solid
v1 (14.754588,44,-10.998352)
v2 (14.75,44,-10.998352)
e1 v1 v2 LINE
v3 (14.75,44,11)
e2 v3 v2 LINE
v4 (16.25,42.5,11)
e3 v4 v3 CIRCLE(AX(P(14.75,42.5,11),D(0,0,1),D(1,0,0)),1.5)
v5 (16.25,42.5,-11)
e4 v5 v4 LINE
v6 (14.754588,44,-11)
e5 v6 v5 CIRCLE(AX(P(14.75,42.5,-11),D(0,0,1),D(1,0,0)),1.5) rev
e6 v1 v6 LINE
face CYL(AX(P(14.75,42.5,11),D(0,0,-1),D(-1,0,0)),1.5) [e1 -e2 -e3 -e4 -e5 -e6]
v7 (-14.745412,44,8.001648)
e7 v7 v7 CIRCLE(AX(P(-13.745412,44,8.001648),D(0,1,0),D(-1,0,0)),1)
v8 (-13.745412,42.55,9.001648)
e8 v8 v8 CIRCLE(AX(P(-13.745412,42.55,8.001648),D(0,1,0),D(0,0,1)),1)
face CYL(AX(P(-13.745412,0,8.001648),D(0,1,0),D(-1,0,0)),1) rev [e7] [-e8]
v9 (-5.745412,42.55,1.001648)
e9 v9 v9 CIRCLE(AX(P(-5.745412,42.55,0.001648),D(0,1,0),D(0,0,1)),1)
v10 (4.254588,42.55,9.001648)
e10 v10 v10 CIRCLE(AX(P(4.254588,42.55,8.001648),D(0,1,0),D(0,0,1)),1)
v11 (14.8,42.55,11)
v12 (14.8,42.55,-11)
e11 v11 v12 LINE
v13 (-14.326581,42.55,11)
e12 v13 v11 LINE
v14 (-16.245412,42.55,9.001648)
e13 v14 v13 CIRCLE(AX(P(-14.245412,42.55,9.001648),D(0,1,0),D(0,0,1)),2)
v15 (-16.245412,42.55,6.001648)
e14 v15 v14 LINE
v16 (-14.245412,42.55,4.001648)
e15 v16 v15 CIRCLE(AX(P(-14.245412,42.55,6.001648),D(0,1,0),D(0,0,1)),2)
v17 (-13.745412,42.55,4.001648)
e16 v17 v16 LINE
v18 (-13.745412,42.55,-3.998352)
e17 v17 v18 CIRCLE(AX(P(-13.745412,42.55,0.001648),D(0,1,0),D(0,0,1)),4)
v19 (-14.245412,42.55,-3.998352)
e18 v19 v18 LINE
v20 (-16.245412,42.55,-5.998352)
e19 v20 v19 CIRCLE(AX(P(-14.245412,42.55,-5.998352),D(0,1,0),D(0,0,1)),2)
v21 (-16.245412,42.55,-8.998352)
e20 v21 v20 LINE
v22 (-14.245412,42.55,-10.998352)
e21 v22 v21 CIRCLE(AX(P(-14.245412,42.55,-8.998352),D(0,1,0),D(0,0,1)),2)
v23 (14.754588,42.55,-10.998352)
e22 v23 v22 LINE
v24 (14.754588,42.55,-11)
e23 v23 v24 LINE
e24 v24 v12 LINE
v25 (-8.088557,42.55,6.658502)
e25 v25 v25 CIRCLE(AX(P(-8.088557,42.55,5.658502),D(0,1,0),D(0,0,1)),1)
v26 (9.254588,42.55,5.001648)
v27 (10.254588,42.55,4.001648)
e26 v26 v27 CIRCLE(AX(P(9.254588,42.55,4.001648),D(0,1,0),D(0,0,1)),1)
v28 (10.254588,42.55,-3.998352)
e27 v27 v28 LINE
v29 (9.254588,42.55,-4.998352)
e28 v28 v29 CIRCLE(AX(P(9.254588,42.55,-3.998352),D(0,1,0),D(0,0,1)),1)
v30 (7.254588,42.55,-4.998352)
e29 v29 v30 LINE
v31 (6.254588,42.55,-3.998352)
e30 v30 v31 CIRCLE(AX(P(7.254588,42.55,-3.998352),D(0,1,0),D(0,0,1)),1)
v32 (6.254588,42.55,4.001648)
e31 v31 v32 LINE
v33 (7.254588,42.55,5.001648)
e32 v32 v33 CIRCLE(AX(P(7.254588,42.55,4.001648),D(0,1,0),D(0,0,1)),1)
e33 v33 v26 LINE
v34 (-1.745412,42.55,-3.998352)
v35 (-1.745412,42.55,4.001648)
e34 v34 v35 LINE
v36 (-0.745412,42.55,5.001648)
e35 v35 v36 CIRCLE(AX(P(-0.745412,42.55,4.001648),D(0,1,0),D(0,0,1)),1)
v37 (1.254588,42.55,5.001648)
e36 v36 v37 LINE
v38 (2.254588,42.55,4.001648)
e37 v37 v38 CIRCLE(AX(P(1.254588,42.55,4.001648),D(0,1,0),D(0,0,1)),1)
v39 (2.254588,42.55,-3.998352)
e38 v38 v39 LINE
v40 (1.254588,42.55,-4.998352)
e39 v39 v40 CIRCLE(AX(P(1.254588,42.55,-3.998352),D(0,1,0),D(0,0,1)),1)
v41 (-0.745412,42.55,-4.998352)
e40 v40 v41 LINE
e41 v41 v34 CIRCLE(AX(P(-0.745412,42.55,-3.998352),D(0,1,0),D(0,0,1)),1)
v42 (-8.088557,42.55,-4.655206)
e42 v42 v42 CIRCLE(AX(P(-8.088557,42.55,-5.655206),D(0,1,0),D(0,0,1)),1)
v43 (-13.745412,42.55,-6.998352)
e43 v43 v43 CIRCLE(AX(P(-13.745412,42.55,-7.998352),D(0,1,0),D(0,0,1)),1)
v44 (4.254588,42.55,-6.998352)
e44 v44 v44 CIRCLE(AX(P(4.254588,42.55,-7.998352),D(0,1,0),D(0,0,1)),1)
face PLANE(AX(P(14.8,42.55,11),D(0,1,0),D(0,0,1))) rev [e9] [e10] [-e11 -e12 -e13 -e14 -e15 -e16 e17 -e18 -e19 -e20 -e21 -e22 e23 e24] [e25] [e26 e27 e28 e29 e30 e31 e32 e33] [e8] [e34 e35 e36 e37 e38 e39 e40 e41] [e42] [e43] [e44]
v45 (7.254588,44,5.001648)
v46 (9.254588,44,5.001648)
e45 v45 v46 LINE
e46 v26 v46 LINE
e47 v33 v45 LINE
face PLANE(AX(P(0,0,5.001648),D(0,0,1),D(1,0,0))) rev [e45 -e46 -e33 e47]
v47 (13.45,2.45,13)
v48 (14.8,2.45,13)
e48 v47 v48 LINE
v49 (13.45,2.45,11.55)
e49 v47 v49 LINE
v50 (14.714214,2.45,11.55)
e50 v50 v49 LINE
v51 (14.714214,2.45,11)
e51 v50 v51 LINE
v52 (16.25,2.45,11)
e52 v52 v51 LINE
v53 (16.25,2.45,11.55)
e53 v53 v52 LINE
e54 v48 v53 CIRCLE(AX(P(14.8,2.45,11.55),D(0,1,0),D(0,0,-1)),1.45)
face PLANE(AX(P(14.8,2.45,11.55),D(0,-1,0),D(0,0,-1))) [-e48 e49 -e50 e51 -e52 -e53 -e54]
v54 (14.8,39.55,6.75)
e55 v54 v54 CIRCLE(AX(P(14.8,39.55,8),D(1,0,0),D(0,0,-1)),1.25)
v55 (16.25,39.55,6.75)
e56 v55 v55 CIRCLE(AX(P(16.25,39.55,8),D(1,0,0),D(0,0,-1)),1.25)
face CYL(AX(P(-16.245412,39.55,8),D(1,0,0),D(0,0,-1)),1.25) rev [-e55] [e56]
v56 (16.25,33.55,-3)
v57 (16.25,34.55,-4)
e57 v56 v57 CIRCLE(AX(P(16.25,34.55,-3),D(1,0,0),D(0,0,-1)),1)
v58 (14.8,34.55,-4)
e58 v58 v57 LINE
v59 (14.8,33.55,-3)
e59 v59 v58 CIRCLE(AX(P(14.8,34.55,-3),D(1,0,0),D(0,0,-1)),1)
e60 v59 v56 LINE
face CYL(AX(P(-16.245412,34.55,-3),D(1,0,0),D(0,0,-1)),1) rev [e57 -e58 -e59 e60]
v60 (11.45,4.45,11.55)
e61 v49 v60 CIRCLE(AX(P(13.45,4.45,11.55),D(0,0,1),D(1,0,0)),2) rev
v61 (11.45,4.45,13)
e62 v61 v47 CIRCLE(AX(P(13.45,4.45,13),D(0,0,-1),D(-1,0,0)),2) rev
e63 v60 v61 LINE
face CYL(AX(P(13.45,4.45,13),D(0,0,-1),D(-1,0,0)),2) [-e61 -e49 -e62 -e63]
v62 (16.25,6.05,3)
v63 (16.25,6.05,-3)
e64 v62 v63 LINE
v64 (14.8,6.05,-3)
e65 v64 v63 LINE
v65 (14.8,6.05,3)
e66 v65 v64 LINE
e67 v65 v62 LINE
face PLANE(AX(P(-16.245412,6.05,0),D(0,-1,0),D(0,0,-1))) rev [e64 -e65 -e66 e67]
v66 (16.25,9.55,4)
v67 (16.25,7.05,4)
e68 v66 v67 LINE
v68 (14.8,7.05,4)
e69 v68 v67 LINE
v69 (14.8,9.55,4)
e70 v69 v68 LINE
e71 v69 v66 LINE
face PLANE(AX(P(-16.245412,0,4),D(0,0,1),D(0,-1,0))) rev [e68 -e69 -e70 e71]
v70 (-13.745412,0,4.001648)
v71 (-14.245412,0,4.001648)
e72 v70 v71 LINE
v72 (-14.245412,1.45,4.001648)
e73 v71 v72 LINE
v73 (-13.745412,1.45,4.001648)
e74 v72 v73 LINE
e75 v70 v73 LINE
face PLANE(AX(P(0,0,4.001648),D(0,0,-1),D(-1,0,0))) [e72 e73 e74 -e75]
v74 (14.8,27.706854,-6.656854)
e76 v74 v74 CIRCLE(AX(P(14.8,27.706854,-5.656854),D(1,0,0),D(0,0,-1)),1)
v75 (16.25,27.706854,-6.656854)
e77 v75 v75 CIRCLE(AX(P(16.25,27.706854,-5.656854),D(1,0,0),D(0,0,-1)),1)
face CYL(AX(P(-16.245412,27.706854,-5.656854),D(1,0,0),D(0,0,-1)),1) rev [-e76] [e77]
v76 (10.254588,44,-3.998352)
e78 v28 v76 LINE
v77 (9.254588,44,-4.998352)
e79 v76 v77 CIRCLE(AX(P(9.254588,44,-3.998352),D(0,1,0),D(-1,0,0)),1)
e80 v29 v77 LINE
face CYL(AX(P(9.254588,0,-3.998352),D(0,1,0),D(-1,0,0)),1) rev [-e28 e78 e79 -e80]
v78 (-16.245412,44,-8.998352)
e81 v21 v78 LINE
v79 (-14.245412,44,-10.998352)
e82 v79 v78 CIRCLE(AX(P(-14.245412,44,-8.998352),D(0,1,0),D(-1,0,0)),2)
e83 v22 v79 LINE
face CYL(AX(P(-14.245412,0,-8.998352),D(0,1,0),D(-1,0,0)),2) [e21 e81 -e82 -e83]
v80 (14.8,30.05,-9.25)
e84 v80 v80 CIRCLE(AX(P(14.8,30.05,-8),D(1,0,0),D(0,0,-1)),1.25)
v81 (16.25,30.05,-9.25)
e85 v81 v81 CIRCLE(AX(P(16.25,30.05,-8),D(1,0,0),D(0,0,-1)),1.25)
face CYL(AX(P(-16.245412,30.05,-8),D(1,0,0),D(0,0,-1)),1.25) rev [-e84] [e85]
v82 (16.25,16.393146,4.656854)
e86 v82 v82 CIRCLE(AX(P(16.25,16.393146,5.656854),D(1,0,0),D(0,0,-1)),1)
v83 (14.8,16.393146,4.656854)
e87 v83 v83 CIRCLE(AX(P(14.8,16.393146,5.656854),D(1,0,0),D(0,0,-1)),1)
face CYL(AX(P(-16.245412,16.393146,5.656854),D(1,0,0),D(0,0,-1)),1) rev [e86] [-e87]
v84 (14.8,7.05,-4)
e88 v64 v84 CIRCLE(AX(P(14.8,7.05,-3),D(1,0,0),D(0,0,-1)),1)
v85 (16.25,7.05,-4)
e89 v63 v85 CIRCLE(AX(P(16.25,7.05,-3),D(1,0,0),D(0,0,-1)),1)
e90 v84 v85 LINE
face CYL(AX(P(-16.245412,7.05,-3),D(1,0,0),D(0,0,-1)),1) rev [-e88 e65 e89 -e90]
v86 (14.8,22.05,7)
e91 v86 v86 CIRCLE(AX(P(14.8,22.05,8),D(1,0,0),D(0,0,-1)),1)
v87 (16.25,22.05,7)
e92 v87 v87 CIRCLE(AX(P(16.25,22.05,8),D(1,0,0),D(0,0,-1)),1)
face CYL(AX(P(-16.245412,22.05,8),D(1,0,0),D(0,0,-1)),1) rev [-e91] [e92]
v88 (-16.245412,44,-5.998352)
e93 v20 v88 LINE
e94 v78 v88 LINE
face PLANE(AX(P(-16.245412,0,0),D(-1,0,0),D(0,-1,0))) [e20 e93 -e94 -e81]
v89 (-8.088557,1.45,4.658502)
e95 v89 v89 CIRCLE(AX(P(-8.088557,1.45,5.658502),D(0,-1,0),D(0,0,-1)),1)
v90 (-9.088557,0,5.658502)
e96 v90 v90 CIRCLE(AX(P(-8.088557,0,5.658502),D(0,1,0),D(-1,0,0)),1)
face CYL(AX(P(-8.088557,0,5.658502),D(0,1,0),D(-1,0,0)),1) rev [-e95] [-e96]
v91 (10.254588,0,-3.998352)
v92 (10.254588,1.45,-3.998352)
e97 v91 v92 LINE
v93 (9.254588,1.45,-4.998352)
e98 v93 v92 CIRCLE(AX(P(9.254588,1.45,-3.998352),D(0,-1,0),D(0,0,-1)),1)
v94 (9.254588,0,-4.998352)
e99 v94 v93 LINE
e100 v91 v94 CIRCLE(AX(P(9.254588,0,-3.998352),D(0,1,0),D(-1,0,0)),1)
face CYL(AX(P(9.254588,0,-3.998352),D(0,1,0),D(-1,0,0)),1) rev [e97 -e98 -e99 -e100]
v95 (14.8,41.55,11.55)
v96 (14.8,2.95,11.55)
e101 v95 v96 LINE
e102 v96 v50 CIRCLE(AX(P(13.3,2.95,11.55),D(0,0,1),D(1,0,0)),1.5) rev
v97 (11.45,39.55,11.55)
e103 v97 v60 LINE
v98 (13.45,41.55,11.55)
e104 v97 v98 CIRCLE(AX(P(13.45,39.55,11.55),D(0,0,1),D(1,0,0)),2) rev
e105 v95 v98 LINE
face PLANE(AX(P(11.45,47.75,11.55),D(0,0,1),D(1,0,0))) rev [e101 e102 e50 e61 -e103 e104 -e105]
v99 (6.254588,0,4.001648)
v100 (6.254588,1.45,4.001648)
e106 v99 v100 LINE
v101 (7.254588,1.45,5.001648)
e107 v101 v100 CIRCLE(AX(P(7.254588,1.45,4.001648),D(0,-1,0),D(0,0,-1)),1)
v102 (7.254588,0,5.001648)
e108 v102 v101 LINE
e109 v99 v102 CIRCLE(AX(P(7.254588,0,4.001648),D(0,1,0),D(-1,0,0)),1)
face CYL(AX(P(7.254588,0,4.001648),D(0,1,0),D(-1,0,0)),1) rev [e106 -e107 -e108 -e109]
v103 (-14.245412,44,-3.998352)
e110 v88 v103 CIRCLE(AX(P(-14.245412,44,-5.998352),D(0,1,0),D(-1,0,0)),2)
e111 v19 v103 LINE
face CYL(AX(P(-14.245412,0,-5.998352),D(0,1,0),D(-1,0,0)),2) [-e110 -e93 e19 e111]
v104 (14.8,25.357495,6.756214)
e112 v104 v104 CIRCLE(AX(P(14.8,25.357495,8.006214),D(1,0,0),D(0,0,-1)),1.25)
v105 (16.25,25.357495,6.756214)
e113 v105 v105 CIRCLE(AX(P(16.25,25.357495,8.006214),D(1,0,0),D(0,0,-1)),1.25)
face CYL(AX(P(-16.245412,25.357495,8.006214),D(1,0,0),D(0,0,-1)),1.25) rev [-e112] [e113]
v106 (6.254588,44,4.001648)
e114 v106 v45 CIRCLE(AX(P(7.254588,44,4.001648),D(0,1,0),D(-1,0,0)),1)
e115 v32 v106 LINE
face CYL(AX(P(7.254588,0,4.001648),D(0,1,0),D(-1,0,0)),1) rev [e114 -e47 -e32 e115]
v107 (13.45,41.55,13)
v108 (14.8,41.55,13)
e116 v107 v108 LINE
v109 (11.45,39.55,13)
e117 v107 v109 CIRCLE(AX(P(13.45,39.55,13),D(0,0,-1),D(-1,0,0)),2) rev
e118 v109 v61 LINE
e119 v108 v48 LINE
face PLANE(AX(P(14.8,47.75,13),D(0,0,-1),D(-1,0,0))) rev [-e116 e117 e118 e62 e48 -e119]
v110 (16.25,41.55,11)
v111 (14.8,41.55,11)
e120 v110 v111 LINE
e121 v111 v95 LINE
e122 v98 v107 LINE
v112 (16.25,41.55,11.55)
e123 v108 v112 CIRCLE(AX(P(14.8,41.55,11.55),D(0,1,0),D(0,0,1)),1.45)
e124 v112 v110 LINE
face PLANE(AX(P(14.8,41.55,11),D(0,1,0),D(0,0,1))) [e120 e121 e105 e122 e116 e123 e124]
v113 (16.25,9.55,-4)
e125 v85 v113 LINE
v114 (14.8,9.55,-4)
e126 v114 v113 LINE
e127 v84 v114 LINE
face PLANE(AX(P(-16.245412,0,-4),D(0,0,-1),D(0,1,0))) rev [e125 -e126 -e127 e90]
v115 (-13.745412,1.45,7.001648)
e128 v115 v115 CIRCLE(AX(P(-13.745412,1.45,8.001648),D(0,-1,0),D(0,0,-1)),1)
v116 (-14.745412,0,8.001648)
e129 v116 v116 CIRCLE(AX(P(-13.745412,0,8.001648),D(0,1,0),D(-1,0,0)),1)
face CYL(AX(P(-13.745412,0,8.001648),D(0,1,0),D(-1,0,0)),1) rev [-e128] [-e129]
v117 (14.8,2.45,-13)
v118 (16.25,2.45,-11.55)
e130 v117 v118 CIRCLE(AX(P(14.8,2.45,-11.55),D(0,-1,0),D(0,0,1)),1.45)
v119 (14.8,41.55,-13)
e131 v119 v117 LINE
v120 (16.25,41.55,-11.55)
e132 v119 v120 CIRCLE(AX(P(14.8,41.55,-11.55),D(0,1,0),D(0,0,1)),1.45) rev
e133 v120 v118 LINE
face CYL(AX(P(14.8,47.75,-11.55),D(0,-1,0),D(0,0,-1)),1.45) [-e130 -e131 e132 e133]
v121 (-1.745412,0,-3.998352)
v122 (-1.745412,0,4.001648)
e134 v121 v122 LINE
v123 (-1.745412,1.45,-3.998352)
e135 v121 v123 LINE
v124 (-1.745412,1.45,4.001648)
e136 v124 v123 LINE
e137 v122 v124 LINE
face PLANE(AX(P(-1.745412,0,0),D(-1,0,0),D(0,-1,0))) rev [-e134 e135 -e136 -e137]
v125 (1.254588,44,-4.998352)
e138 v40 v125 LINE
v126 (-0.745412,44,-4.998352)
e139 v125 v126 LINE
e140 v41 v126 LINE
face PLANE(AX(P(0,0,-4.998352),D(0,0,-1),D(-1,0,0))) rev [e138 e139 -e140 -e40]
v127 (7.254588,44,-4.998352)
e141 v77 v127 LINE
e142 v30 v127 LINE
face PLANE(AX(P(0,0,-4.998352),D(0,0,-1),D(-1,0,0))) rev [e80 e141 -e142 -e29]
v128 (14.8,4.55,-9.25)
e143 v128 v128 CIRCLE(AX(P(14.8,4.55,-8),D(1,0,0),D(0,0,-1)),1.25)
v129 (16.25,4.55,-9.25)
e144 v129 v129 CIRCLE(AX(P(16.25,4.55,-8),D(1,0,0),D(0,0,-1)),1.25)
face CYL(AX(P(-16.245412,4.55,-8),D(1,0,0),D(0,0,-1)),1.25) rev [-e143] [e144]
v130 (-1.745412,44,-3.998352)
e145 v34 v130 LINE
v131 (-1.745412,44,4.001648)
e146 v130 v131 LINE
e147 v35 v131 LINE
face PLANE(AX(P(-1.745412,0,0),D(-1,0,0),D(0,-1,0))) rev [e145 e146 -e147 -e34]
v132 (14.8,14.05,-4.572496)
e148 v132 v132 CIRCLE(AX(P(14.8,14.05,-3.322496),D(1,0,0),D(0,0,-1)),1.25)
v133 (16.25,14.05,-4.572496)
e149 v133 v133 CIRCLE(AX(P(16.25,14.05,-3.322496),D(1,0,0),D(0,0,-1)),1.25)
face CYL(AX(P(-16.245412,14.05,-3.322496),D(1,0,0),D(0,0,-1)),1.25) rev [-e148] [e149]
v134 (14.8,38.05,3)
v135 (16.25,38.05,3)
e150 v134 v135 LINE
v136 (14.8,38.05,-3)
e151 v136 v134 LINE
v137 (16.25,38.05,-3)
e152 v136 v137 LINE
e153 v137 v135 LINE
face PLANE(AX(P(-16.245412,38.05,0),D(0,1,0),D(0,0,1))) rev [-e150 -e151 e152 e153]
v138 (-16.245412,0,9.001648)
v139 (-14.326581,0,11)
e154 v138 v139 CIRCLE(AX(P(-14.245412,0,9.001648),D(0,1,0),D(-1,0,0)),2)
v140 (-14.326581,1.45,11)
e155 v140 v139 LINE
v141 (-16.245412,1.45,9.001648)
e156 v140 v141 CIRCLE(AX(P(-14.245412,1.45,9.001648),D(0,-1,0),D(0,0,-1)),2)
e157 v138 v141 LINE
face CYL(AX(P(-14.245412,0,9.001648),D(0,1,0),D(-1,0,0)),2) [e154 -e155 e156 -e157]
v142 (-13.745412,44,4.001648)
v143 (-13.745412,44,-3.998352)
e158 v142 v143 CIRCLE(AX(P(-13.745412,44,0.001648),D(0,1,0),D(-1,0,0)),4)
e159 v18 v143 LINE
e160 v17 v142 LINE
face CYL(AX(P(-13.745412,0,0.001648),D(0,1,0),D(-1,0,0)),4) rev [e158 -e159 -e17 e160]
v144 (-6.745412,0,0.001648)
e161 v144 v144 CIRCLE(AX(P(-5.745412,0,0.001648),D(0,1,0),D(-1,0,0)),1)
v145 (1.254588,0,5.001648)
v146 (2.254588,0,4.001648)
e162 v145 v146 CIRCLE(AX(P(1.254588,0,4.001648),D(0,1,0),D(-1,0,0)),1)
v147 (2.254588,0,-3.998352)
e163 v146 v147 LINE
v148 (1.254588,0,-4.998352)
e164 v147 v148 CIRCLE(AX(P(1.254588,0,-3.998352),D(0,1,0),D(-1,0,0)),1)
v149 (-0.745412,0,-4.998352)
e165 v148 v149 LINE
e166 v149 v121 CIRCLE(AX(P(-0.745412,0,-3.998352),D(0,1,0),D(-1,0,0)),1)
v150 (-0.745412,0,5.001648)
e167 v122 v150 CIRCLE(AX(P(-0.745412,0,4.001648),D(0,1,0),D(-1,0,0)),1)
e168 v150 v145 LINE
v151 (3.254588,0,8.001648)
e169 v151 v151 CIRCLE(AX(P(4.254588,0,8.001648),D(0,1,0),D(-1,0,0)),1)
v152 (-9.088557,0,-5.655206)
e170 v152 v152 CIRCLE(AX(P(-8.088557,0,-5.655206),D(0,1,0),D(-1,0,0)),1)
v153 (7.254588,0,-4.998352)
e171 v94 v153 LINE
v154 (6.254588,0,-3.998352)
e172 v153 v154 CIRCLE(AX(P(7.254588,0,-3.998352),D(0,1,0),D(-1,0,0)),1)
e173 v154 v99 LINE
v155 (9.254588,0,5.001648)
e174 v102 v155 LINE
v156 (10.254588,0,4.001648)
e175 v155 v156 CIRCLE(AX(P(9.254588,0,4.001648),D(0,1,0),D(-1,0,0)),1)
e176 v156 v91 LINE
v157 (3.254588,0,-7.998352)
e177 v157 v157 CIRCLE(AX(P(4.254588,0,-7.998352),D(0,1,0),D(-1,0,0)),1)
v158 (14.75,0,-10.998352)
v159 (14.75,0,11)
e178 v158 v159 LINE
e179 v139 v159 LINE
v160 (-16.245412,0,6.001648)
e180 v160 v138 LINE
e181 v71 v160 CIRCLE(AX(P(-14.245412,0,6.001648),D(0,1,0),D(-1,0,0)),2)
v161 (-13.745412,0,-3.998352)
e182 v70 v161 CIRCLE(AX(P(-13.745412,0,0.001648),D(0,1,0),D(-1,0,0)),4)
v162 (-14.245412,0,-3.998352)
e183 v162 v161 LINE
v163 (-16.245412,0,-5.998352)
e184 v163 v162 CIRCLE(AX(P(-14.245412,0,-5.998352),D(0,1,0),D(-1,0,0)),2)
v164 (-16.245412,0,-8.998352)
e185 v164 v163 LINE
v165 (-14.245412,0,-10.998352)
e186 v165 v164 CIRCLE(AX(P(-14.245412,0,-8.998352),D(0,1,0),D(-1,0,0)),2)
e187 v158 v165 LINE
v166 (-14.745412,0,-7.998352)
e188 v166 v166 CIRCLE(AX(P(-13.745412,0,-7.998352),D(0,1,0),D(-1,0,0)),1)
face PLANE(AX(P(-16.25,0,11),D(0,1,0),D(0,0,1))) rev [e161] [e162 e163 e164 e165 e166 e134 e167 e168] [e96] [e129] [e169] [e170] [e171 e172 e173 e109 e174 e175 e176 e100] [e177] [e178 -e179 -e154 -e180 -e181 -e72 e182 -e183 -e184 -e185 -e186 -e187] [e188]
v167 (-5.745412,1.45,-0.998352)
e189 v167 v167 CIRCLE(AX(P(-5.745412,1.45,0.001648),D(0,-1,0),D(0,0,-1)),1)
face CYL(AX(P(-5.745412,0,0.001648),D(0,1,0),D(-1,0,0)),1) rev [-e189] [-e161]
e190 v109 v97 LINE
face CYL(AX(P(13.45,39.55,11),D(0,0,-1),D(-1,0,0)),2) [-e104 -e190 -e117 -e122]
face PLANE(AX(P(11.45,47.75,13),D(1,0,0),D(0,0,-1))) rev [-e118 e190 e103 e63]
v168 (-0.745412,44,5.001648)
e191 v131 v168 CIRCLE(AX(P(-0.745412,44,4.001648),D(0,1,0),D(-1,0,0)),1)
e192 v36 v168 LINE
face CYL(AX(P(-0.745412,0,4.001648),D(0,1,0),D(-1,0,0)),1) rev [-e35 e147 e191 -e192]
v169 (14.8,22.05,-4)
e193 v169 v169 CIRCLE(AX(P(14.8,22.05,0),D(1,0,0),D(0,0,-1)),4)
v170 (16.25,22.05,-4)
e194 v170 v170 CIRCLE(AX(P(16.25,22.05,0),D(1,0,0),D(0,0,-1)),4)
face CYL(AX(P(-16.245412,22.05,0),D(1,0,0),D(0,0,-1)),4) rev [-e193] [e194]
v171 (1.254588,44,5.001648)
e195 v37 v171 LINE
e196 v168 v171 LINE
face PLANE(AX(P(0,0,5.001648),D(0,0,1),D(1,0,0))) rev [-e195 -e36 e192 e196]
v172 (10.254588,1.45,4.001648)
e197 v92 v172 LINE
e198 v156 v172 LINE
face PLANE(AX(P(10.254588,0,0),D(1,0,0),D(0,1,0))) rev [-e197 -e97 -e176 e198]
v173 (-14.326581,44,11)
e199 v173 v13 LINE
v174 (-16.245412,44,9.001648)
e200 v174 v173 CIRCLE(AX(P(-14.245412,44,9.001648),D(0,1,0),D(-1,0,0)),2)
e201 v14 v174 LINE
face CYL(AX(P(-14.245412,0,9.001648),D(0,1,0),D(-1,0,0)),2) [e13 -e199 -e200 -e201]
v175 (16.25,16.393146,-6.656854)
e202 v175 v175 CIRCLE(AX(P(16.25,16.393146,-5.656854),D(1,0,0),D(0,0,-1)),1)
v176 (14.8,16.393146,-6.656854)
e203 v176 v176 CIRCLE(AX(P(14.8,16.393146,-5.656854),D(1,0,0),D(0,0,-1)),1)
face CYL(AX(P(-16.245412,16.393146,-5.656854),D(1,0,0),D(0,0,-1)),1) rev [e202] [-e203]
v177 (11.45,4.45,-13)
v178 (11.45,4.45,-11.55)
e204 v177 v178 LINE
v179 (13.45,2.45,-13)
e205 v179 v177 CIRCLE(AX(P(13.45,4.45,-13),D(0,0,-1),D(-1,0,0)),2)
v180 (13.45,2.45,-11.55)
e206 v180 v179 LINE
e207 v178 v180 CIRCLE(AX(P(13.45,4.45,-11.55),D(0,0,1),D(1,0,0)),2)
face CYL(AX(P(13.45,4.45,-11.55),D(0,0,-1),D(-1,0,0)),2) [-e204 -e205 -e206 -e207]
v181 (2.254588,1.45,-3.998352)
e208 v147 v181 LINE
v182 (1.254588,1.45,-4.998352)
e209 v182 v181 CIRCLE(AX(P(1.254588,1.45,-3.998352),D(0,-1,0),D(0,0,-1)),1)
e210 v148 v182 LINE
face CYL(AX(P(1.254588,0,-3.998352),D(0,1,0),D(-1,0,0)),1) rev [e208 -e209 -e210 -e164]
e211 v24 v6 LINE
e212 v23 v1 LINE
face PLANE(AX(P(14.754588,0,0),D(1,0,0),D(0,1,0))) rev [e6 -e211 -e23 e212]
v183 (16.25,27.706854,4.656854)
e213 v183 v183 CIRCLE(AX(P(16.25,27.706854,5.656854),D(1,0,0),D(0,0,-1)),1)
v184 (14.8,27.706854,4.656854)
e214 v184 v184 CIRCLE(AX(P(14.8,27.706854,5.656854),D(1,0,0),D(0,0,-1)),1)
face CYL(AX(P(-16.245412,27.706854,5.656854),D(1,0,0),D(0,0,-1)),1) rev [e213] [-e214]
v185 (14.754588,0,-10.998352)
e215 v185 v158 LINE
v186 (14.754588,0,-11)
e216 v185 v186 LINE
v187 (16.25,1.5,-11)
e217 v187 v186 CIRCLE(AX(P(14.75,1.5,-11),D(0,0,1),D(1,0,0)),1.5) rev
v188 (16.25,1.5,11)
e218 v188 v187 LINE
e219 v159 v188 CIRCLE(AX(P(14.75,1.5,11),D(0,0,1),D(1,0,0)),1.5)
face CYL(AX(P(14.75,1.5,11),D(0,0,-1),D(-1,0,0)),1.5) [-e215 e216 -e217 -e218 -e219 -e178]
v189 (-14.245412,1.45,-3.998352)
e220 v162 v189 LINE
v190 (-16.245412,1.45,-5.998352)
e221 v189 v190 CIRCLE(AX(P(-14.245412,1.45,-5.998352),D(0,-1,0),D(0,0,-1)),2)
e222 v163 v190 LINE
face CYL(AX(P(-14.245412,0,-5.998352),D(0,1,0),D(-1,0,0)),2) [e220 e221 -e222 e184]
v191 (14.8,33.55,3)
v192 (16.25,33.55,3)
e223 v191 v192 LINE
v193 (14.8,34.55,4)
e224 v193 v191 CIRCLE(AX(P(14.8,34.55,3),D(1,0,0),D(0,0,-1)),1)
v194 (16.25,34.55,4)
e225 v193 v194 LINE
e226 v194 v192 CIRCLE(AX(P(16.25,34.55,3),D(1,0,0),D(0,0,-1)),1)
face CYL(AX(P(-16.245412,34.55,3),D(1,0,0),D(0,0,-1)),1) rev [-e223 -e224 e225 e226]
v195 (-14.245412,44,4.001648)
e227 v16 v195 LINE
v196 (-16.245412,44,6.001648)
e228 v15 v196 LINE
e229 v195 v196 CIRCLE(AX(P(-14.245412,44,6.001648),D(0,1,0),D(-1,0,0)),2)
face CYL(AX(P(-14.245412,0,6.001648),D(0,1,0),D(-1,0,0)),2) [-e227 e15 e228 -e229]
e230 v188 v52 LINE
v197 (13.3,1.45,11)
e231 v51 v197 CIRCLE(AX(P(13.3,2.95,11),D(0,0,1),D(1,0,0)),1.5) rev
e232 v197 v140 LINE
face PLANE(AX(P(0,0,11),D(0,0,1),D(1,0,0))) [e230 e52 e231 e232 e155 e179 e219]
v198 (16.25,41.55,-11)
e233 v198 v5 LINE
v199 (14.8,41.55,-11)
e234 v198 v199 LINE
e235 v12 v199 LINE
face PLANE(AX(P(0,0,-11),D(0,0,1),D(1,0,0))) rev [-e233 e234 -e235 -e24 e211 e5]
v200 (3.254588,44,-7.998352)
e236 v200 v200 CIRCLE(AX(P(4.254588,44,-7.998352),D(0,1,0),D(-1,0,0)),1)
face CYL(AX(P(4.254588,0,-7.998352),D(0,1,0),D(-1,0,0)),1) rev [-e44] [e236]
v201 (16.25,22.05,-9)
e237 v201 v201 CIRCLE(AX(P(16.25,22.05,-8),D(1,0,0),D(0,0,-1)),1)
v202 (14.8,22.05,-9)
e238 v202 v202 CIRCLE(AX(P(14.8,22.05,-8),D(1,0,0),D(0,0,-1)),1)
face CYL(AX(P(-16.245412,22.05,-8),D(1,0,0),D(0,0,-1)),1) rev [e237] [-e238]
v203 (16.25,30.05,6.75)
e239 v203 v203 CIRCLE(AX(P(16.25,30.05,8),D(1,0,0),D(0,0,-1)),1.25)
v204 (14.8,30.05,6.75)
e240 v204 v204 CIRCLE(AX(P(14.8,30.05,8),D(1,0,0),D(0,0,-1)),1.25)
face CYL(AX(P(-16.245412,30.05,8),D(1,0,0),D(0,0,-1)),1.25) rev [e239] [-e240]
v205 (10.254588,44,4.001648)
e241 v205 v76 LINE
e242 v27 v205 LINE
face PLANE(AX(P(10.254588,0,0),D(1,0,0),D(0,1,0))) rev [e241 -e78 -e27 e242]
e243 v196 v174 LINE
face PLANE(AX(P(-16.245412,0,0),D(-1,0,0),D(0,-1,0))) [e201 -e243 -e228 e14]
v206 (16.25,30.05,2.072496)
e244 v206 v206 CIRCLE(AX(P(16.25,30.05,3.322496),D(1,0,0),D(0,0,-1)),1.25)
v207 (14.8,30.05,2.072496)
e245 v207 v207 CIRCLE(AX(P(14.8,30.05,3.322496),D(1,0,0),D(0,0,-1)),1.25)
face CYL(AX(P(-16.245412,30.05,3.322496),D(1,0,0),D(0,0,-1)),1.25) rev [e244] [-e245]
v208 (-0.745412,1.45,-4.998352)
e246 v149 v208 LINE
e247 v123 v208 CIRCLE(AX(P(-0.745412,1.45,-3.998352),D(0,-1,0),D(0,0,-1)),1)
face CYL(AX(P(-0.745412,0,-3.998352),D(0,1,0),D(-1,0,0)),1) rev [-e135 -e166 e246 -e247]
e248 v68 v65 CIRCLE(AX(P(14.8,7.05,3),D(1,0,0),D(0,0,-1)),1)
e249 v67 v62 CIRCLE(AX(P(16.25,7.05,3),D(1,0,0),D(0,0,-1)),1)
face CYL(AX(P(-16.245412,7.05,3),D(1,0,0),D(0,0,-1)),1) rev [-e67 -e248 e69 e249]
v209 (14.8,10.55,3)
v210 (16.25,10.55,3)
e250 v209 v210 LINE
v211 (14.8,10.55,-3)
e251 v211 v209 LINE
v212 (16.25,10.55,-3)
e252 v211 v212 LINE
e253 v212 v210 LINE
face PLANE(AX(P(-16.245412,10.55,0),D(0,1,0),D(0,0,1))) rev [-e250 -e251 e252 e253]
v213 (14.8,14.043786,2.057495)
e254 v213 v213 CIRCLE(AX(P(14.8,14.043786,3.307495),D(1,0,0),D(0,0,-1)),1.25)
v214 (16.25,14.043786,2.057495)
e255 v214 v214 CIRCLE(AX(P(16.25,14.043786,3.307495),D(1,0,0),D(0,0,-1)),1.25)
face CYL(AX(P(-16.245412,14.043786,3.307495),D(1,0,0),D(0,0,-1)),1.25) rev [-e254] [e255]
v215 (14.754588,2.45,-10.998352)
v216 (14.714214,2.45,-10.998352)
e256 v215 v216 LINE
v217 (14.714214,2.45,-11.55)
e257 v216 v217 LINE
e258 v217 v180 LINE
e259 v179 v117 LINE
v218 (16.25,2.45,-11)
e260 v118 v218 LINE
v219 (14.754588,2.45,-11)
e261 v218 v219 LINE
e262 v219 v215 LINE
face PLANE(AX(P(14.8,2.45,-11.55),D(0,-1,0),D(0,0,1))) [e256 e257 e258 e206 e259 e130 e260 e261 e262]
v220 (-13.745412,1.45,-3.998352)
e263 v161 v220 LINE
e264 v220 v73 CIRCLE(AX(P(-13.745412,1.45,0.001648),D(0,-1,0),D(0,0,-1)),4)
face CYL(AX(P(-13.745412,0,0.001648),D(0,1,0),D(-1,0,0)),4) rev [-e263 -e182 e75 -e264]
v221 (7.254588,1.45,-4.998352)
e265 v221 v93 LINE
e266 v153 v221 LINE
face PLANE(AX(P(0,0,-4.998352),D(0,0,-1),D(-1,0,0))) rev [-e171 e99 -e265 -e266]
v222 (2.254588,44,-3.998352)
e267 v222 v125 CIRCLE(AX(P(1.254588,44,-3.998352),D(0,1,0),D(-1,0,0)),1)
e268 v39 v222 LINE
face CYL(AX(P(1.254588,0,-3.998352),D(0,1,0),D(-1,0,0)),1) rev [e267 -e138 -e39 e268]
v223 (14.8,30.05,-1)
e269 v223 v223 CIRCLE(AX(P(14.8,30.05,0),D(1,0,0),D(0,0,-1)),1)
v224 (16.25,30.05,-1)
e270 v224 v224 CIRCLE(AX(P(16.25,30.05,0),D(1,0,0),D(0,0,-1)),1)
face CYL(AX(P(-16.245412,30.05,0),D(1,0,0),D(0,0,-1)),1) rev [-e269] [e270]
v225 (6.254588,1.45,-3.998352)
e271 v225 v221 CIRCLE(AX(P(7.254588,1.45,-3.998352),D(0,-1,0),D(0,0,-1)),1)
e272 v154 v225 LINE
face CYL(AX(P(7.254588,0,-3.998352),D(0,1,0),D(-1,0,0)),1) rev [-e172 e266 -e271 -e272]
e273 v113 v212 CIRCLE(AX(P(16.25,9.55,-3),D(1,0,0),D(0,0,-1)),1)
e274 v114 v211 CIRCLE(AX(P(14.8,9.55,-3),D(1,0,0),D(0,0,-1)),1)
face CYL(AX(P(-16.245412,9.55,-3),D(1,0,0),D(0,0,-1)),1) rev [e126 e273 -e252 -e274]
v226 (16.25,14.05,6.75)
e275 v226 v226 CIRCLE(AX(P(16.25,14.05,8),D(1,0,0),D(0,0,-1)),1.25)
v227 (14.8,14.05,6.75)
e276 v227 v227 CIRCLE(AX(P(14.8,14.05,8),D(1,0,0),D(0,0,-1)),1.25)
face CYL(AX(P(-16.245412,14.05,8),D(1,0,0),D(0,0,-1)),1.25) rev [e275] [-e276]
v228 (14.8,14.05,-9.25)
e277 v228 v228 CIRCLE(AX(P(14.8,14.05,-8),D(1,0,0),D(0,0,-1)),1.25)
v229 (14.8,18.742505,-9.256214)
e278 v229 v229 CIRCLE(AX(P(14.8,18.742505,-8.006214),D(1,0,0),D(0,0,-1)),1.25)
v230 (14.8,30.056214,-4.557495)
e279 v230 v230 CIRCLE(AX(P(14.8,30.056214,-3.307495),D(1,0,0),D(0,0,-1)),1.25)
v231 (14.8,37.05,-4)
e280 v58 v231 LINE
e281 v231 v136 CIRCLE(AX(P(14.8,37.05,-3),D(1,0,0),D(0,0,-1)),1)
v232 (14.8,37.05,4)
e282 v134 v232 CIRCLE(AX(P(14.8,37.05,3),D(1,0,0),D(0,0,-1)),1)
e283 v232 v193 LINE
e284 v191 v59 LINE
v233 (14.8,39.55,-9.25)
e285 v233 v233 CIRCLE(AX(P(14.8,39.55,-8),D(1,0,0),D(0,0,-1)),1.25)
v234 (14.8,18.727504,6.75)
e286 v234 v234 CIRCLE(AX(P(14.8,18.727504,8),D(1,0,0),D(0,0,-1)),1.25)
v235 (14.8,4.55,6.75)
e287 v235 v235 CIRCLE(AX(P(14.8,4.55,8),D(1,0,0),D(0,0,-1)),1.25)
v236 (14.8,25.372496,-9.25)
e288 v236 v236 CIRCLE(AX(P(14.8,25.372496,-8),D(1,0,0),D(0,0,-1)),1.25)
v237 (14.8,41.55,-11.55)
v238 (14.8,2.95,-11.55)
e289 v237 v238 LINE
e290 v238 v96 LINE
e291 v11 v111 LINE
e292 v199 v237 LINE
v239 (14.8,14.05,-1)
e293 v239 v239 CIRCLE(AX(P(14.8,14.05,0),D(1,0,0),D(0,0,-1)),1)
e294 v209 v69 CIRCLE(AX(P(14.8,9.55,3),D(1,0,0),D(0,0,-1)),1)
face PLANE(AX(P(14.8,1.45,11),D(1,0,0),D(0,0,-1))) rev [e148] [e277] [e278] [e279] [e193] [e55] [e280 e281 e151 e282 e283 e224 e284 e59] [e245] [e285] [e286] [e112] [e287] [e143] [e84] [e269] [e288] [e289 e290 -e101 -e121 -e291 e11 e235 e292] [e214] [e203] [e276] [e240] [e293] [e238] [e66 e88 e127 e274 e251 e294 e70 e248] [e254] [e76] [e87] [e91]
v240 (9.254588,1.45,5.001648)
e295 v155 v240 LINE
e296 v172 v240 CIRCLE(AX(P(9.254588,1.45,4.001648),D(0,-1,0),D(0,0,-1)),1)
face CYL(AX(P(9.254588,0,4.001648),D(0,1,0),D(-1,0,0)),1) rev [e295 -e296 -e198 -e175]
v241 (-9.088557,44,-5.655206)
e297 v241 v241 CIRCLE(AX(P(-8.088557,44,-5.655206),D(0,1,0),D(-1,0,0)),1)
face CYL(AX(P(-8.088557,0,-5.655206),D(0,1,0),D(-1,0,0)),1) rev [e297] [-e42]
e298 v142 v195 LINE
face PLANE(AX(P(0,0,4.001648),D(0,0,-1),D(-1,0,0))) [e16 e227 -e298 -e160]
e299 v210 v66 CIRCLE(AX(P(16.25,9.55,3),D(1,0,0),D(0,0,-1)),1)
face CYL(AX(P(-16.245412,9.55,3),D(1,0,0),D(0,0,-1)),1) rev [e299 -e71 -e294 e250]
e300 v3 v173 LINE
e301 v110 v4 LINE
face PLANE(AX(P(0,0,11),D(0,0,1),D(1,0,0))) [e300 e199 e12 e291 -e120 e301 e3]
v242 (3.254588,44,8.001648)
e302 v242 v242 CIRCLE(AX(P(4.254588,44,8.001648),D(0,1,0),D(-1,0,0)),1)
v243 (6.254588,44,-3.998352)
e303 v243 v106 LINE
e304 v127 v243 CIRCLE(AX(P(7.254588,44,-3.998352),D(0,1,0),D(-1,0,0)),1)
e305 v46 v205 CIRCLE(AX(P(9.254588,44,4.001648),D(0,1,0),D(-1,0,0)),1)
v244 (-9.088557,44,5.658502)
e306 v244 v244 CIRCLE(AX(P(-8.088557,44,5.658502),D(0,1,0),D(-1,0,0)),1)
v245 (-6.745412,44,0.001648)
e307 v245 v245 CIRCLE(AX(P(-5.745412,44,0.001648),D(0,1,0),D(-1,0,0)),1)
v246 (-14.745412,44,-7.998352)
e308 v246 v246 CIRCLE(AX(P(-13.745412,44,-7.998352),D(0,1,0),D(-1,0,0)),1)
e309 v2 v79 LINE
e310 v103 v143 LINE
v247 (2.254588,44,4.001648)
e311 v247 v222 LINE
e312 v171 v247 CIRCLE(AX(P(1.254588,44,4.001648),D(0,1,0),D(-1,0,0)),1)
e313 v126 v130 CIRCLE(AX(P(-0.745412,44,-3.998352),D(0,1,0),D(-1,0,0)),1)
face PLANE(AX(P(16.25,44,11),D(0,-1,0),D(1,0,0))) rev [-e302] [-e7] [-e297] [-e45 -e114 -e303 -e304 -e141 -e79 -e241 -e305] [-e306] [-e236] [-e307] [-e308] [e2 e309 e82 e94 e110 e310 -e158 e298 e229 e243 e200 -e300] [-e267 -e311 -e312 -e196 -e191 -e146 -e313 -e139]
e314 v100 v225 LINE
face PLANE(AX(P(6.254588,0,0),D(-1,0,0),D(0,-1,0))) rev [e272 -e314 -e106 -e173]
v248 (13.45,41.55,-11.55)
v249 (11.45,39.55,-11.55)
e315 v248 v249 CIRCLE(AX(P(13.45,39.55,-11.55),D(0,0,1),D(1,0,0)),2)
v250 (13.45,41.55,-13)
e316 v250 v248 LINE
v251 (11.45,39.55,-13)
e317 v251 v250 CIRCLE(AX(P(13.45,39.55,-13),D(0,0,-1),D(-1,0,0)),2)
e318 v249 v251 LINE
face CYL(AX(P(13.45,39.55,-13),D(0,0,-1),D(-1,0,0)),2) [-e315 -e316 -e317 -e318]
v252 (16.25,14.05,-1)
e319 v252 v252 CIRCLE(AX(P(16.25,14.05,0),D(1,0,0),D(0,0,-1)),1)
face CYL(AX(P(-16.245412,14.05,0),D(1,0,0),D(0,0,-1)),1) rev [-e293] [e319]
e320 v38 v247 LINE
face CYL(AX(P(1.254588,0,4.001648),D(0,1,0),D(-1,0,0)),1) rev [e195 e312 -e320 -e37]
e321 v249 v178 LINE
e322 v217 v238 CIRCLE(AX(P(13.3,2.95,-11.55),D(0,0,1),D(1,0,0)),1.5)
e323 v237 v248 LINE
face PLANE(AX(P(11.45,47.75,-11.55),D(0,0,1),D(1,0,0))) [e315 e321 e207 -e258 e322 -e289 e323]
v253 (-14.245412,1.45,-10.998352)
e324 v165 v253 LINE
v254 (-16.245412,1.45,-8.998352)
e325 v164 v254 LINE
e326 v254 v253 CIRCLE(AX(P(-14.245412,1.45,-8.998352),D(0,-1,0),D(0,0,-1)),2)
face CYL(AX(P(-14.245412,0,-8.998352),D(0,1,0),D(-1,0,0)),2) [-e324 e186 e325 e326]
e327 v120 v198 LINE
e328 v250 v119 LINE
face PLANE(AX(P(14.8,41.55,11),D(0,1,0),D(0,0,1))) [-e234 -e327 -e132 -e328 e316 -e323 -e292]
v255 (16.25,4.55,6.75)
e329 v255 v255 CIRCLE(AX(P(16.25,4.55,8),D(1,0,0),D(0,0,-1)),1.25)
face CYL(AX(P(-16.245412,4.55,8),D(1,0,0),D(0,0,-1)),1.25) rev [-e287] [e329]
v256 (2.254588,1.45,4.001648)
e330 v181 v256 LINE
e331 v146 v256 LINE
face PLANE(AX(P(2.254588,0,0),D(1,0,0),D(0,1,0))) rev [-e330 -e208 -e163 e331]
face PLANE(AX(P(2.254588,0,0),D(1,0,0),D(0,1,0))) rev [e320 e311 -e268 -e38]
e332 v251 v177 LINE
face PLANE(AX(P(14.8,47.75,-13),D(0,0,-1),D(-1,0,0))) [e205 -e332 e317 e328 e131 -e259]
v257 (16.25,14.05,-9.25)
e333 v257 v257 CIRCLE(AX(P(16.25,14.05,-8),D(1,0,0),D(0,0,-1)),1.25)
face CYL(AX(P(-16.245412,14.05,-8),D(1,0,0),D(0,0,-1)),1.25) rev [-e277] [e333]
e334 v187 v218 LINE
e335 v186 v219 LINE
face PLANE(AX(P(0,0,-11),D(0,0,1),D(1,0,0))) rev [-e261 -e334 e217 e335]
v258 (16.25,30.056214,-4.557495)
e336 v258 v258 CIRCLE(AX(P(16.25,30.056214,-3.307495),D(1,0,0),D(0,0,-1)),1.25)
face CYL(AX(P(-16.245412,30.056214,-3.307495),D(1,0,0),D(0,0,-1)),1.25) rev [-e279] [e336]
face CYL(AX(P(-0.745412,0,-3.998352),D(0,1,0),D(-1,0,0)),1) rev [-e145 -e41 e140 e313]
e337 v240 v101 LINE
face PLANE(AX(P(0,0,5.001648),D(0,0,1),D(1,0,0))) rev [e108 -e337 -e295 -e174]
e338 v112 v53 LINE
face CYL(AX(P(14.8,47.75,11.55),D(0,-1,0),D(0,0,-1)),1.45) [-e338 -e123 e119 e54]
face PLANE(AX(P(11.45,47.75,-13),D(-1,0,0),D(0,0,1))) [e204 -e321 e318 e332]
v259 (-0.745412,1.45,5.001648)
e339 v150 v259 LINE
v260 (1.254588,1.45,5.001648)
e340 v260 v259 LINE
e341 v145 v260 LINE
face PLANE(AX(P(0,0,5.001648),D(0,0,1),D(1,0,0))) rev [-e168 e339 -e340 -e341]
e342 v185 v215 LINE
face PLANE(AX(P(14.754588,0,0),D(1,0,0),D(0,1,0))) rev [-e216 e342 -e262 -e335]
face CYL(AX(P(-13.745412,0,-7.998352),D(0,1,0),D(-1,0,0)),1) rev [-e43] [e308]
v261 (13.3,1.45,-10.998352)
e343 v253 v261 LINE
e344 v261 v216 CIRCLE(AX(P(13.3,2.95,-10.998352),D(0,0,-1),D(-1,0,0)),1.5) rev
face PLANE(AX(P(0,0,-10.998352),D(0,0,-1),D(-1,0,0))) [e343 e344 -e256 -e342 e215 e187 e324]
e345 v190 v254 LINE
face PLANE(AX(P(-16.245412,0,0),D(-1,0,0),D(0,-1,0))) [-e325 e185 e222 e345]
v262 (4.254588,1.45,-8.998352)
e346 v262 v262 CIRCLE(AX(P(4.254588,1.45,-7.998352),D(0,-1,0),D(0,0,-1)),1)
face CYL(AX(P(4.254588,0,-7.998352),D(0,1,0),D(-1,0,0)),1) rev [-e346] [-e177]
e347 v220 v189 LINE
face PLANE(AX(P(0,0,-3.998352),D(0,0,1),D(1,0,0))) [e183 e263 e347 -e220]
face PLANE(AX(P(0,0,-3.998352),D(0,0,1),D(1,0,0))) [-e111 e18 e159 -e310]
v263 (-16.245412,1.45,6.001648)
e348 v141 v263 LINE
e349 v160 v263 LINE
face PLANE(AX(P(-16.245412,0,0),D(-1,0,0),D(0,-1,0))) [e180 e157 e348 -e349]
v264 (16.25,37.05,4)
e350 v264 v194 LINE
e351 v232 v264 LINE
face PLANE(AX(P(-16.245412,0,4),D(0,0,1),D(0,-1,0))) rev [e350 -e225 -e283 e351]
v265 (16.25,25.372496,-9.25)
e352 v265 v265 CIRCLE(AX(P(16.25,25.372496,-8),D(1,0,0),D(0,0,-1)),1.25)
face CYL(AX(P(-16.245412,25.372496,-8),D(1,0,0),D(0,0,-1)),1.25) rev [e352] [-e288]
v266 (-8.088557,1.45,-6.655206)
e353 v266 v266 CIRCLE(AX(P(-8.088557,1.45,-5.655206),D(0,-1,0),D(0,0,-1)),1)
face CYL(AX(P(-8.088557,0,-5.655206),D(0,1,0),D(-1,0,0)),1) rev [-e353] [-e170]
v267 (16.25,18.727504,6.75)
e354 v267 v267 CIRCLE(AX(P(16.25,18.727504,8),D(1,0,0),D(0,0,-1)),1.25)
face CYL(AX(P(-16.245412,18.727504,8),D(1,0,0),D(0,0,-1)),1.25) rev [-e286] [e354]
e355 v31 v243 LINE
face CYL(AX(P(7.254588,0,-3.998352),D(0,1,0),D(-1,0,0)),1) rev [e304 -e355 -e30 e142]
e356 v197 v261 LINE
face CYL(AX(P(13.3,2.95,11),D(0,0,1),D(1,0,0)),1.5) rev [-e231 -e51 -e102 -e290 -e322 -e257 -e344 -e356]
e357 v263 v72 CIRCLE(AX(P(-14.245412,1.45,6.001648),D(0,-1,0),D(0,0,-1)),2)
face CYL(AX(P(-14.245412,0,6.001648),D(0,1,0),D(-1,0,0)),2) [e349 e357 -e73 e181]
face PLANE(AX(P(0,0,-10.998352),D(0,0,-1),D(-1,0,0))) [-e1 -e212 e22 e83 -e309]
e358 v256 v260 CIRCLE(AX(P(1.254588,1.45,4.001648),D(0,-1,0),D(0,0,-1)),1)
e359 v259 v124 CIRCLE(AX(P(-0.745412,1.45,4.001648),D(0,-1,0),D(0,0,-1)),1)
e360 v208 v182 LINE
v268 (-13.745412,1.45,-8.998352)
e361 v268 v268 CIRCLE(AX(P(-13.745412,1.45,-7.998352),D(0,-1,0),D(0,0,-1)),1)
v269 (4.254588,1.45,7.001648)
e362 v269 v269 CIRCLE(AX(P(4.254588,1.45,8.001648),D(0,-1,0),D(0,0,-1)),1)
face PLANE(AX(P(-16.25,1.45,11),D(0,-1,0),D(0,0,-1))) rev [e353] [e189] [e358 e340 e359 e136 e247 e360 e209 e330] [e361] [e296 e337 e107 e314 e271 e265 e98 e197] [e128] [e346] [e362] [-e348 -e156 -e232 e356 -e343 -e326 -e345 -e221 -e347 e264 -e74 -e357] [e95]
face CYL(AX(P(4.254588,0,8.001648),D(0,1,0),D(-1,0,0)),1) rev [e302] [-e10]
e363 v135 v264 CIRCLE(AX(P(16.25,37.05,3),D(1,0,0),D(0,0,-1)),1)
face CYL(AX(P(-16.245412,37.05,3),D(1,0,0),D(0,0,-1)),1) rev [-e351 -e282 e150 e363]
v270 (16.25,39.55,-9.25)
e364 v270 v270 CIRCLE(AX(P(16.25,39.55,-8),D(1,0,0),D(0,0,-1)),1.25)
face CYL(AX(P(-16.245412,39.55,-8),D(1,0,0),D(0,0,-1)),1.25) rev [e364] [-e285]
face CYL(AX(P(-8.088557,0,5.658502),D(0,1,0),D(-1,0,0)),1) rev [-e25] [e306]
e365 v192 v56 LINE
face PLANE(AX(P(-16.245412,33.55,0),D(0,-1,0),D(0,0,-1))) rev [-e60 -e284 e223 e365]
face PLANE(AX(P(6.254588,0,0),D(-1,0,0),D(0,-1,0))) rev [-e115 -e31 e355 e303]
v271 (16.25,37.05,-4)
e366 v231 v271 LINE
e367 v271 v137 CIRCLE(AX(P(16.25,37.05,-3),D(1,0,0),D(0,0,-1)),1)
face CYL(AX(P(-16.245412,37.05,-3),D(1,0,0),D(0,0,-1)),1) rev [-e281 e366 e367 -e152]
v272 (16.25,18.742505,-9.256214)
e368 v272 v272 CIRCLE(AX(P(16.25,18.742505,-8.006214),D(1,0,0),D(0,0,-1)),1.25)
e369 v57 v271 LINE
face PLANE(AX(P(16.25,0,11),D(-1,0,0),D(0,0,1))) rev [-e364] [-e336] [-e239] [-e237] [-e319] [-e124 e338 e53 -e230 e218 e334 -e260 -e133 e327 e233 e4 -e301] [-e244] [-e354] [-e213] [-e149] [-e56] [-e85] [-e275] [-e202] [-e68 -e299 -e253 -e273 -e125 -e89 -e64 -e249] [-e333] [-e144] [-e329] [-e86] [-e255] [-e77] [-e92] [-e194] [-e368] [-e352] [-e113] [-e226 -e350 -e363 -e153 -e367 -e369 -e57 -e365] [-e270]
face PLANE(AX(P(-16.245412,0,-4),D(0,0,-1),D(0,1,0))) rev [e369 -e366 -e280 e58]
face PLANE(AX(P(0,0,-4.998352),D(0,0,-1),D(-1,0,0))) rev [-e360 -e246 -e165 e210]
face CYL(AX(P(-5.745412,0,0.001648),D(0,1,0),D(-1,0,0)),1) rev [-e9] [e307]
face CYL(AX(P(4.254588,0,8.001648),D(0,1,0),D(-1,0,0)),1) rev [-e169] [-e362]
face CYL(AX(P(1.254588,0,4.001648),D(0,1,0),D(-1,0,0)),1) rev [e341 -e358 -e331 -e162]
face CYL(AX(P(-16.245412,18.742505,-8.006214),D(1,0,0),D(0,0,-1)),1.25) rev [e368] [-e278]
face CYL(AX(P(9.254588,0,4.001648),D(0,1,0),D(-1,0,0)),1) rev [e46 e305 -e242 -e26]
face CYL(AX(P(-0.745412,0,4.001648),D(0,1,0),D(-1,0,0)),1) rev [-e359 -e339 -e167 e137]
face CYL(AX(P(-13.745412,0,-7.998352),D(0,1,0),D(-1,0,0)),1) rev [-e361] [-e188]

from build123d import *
from OCP.BRepAlgoAPI import BRepAlgoAPI_Cut
from OCP.TopTools import TopTools_ListOfShape

# Parameters (mm, degrees)
BOSS_EXTRUDE1_DEPTH = 11
SKETCH2_R           = 1
CUT_EXTRUDE1_DEPTH  = 49.17740653
SKETCH3_R           = 4
SKETCH3_R_2         = 1.25
SKETCH3_R_3         = 1
CUT_EXTRUDE3_DEPTH  = 56.793832843
BOSS_EXTRUDE2_DEPTH = 39.1
FILLET1_R           = 2
FILLET2_START       = -11
FILLET2_DEPTH       = 22.55
FILLET2_START_2     = -10.998352219
FILLET2_2_DEPTH     = 21.998352219
FILLET2_START_3     = -13
FILLET2_3_DEPTH     = 26
FILLET2_4_OUTLINE_W = 0.045411726
FILLET2_4_OUTLINE_H = 1
FILLET2_4_DEPTH     = 22


with BuildPart() as part:
    # Sketch1 → Boss-Extrude1 (new, symmetric)
    with BuildSketch(Plane.XY):
        Polygon((-16.25, 0), (16.25, 0), (16.25, 44), (-16.25, 44), (-16.25, 42.55), (14.8, 42.55), (14.8, 1.45), (-16.25, 1.45), align=None)
    extrude(amount=BOSS_EXTRUDE1_DEPTH, both=True)

    # Sketch2 → Cut-Extrude1 (cut, through all)
    with BuildSketch(Plane(origin=(0, 44, 0), x_dir=(1, 0, 0), z_dir=(0, 1, 0))):
        with BuildLine():
            Line((14.754588274, -11.001647781), (-14.245411726, -11.001647781))
            ThreePointArc((-14.245411726, -11.001647781), (-14.286004596, -11.001235793), (-14.326580741, -11))
            Line((-14.326580741, -11), (-16.25, -11))
            Line((-16.25, -11), (-16.25, 11))
            Line((-16.25, 11), (14.754588274, 11))
            Line((14.754588274, 11), (14.754588274, 13.363467794))
            Line((14.754588274, 13.363467794), (-19.651643458, 13.363467794))
            Line((-19.651643458, 13.363467794), (-19.651643458, -13.173756318))
            Line((-19.651643458, -13.173756318), (14.754588274, -13.173756318))
            Line((14.754588274, -13.173756318), (14.754588274, -11.001647781))
        make_face()
        with Locations(Location((-13.745411726, -8.001647781, 0), (0, 0, 180))):
            Circle(SKETCH2_R)
        with Locations(Location((-8.088557477, -5.658502031, 0), (0, 0, 180))):
            Circle(SKETCH2_R)
        with BuildLine():
            Line((1.254588274, 4.998352219), (-0.745411726, 4.998352219))
            ThreePointArc((-0.745411726, 4.998352219), (-1.452518507, 4.705459), (-1.745411726, 3.998352219))
            Line((-1.745411726, 3.998352219), (-1.745411726, -4.001647781))
            ThreePointArc((-1.745411726, -4.001647781), (-1.452518507, -4.708754562), (-0.745411726, -5.001647781))
            Line((-0.745411726, -5.001647781), (1.254588274, -5.001647781))
            ThreePointArc((1.254588274, -5.001647781), (1.961695055, -4.708754562), (2.254588274, -4.001647781))
            Line((2.254588274, -4.001647781), (2.254588274, 3.998352219))
            ThreePointArc((2.254588274, 3.998352219), (1.961695055, 4.705459), (1.254588274, 4.998352219))
        make_face()
        with BuildLine():
            Line((6.254588274, 3.998352219), (6.254588274, -4.001647781))
            ThreePointArc((6.254588274, -4.001647781), (6.547481493, -4.708754562), (7.254588274, -5.001647781))
            Line((7.254588274, -5.001647781), (9.254588274, -5.001647781))
            ThreePointArc((9.254588274, -5.001647781), (9.961695055, -4.708754562), (10.254588274, -4.001647781))
            Line((10.254588274, -4.001647781), (10.254588274, 3.998352219))
            ThreePointArc((10.254588274, 3.998352219), (9.961695055, 4.705459), (9.254588274, 4.998352219))
            Line((9.254588274, 4.998352219), (7.254588274, 4.998352219))
            ThreePointArc((7.254588274, 4.998352219), (6.547481493, 4.705459), (6.254588274, 3.998352219))
        make_face()
        with Locations(Location((4.254588274, -8.001647781, 0), (0, 0, 180))):
            Circle(SKETCH2_R)
        with Locations(Location((-5.745411726, -0.001647781, 0), (0, 0, 180))):
            Circle(SKETCH2_R)
        with Locations(Location((-8.088557477, 5.655206468, 0), (0, 0, 180))):
            Circle(SKETCH2_R)
        with Locations(Location((4.254588274, 7.998352219, 0), (0, 0, 180))):
            Circle(SKETCH2_R)
        with Locations(Location((-13.745411726, 7.998352219, 0), (0, 0, 180))):
            Circle(SKETCH2_R)
        with BuildLine():
            Line((-16.25, -11), (-14.326580741, -11))
            ThreePointArc((-14.326580741, -11), (-15.688037463, -10.386866531), (-16.245411726, -9.001647781))
            Line((-16.245411726, -9.001647781), (-16.245411726, -6.001647781))
            ThreePointArc((-16.245411726, -6.001647781), (-15.659625289, -4.587434219), (-14.245411726, -4.001647781))
            Line((-14.245411726, -4.001647781), (-13.745411726, -4.001647781))
            ThreePointArc((-13.745411726, -4.001647781), (-9.745411726, -0.001647781), (-13.745411726, 3.998352219))
            Line((-13.745411726, 3.998352219), (-14.245411726, 3.998352219))
            ThreePointArc((-14.245411726, 3.998352219), (-15.659625289, 4.584138657), (-16.245411726, 5.998352219))
            Line((-16.245411726, 5.998352219), (-16.245411726, 8.998352219))
            ThreePointArc((-16.245411726, 8.998352219), (-15.659625289, 10.412565781), (-14.245411726, 10.998352219))
            Line((-14.245411726, 10.998352219), (14.754588274, 10.998352219))
            Line((14.754588274, 10.998352219), (14.754588274, 11))
            Line((14.754588274, 11), (-16.25, 11))
            Line((-16.25, 11), (-16.25, -11))
        make_face()
    extrude(amount=-CUT_EXTRUDE1_DEPTH, mode=Mode.SUBTRACT)

    # Sketch3 → Cut-Extrude3 (cut, through all)
    with BuildSketch(Plane(origin=(16.25, 0, 0), x_dir=(0, 0, -1), z_dir=(1, 0, 0))):
        with Locations((0, 22.05)):
            Circle(SKETCH3_R)
        with BuildLine():
            Line((3, 38.05), (-3, 38.05))
            ThreePointArc((-3, 38.05), (-3.707106781, 37.757106781), (-4, 37.05))
            Line((-4, 37.05), (-4, 34.55))
            ThreePointArc((-4, 34.55), (-3.707106781, 33.842893219), (-3, 33.55))
            Line((-3, 33.55), (3, 33.55))
            ThreePointArc((3, 33.55), (3.707106781, 33.842893219), (4, 34.55))
            Line((4, 34.55), (4, 37.05))
            ThreePointArc((4, 37.05), (3.707106781, 37.757106781), (3, 38.05))
        make_face()
        with Locations((3.307494509, 30.05621399)):
            Circle(SKETCH3_R_2)
        with Locations((8, 30.05)):
            Circle(SKETCH3_R_2)
        with Locations((5.656854249, 27.706854249)):
            Circle(SKETCH3_R_3)
        with Locations((8, 25.372496408)):
            Circle(SKETCH3_R_2)
        with Locations((8, 22.05)):
            Circle(SKETCH3_R_3)
        with Locations((0, 30.05)):
            Circle(SKETCH3_R_3)
        with Locations((-3.322496408, 30.05)):
            Circle(SKETCH3_R_2)
        with Locations((-8, 30.05)):
            Circle(SKETCH3_R_2)
        with Locations((-5.656854249, 27.706854249)):
            Circle(SKETCH3_R_3)
        with Locations((-8.00621399, 25.357494509)):
            Circle(SKETCH3_R_2)
        with Locations((-8, 22.05)):
            Circle(SKETCH3_R_3)
        with BuildLine():
            Line((3, 10.55), (-3, 10.55))
            ThreePointArc((-3, 10.55), (-3.707106781, 10.257106781), (-4, 9.55))
            Line((-4, 9.55), (-4, 7.05))
            ThreePointArc((-4, 7.05), (-3.707106781, 6.342893219), (-3, 6.05))
            Line((-3, 6.05), (3, 6.05))
            ThreePointArc((3, 6.05), (3.707106781, 6.342893219), (4, 7.05))
            Line((4, 7.05), (4, 9.55))
            ThreePointArc((4, 9.55), (3.707106781, 10.257106781), (3, 10.55))
        make_face()
        with Locations((-8, 4.55)):
            Circle(SKETCH3_R_2)
        with Locations((8, 4.55)):
            Circle(SKETCH3_R_2)
        with Locations((8, 14.05)):
            Circle(SKETCH3_R_2)
        with Locations((8.00621399, 18.742505491)):
            Circle(SKETCH3_R_2)
        with Locations((5.656854249, 16.393145751)):
            Circle(SKETCH3_R_3)
        with Locations((3.322496408, 14.05)):
            Circle(SKETCH3_R_2)
        with Locations((0, 14.05)):
            Circle(SKETCH3_R_3)
        with Locations((-3.307494509, 14.04378601)):
            Circle(SKETCH3_R_2)
        with Locations((-8, 18.727503592)):
            Circle(SKETCH3_R_2)
        with Locations((-8, 14.05)):
            Circle(SKETCH3_R_2)
        with Locations((8, 39.55)):
            Circle(SKETCH3_R_2)
        with Locations((-8, 39.55)):
            Circle(SKETCH3_R_2)
        with Locations((-5.656854249, 16.393145751)):
            Circle(SKETCH3_R_3)
    extrude(amount=-CUT_EXTRUDE3_DEPTH, mode=Mode.SUBTRACT)

    # Sketch4 → Boss-Extrude2 (add)
    with BuildSketch(Plane(origin=(0, 2.45, 0), x_dir=(1, 0, 0), z_dir=(0, 1, 0))):
        with BuildLine():
            Line((16.25, -11), (16.25, -11.55))
            ThreePointArc((16.25, -11.55), (15.825304833, -12.575304833), (14.8, -13))
            Line((14.8, -13), (11.45, -13))
            Line((11.45, -13), (11.45, -11.55))
            Line((11.45, -11.55), (14.8, -11.55))
            Line((14.8, -11.55), (14.8, -11))
            Line((14.8, -11), (16.25, -11))
        make_face()
    boss_extrude2 = extrude(amount=BOSS_EXTRUDE2_DEPTH)

    # Mirror1: Boss-Extrude2 across plane
    add(boss_extrude2.mirror(Plane.XY))

    # Fillet1
    fillet1_edges = [part.edges().sort_by_distance(p)[0] for p in [
        (11.45, 2.45, 12.275),
        (11.45, 41.55, 12.275),
        (11.45, 2.45, -12.275),
        (11.45, 41.55, -12.275),
    ]]
    fillet(fillet1_edges, radius=FILLET1_R)


with BuildPart() as fillet2_tool:
    # Fillet2: read off the stored shape, not the designer's step
    # Fillet2 outline → Fillet2 (new body)
    with BuildSketch(Plane.XY.offset(FILLET2_START)):
        with BuildLine():
            ThreePointArc((14.754588253, 43.999992983), (15.812281126, 43.559036737), (16.25, 42.5))
            Line((16.25, 42.5), (16.25, 44))
            Line((16.25, 44), (14.754588253, 43.999992983))
        make_face()
        with BuildLine():
            ThreePointArc((16.25, 1.5), (15.812281126, 0.440963263), (14.754588253, 7.017e-06))
            Line((14.754588253, 7.017e-06), (16.25, 0))
            Line((16.25, 0), (16.25, 1.5))
        make_face()
    extrude(amount=FILLET2_DEPTH)


with BuildPart() as part_1:
    add(part.part)

    # Fillet2: cut by fillet2_tool, with a tolerance
    fillet2_stock = TopTools_ListOfShape()
    fillet2_stock.Append(part_1.part.wrapped)
    fillet2_tools = TopTools_ListOfShape()
    fillet2_tools.Append(fillet2_tool.part.wrapped)
    fillet2_cut = BRepAlgoAPI_Cut()
    fillet2_cut.SetArguments(fillet2_stock)
    fillet2_cut.SetTools(fillet2_tools)
    fillet2_cut.SetFuzzyValue(0.00001)
    fillet2_cut.Build()
    add(Compound.cast(fillet2_cut.Shape()).solids(), mode=Mode.REPLACE)


with BuildPart() as fillet2_2_tool:
    # Fillet2 2 outline → Fillet2 2 (new body)
    with BuildSketch(Plane.XY.offset(FILLET2_START_2)):
        with BuildLine():
            Line((13.3, 1.45), (14.8, 1.45))
            Line((14.8, 1.45), (14.8, 2.95))
            ThreePointArc((14.8, 2.95), (14.360660172, 1.889339828), (13.3, 1.45))
        make_face()
    extrude(amount=FILLET2_2_DEPTH)


with BuildPart() as part_2:
    add(part_1.part)


with BuildPart() as part_3:
    # Fillet2 2: joined with fillet2_2_tool
    add(part_2.part.fuse(fillet2_2_tool.part, tol=0.00001))


with BuildPart() as fillet2_3_tool:
    # Fillet2 3 outline → Fillet2 3 (new body)
    with BuildSketch(Plane.XY.offset(FILLET2_START_3)):
        with BuildLine():
            Line((14.714213563, 2.45), (14.8, 2.45))
            Line((14.8, 2.45), (14.8, 2.95))
            ThreePointArc((14.8, 2.95), (14.77839784, 2.696347032), (14.714213563, 2.45))
        make_face()
    extrude(amount=FILLET2_3_DEPTH)


with BuildPart() as part_4:
    add(part_3.part)


with BuildPart() as part_5:
    # Fillet2 3: joined with fillet2_3_tool
    add(part_4.part.fuse(fillet2_3_tool.part, tol=0.00001))


with BuildPart() as fillet2_4_tool:
    # Fillet2 4 outline → Fillet2 4 (new body)
    with BuildSketch(Plane.XY.offset(FILLET2_START)):
        with Locations((14.777294137, 1.95)):
            Rectangle(FILLET2_4_OUTLINE_W, FILLET2_4_OUTLINE_H)
    extrude(amount=FILLET2_4_DEPTH)


with BuildPart() as part_6:
    add(part_5.part)


with BuildPart() as part_7:
    # Fillet2 4: joined with fillet2_4_tool
    add(part_6.part.fuse(fillet2_4_tool.part, tol=0.00001))


solid = part_7.part
